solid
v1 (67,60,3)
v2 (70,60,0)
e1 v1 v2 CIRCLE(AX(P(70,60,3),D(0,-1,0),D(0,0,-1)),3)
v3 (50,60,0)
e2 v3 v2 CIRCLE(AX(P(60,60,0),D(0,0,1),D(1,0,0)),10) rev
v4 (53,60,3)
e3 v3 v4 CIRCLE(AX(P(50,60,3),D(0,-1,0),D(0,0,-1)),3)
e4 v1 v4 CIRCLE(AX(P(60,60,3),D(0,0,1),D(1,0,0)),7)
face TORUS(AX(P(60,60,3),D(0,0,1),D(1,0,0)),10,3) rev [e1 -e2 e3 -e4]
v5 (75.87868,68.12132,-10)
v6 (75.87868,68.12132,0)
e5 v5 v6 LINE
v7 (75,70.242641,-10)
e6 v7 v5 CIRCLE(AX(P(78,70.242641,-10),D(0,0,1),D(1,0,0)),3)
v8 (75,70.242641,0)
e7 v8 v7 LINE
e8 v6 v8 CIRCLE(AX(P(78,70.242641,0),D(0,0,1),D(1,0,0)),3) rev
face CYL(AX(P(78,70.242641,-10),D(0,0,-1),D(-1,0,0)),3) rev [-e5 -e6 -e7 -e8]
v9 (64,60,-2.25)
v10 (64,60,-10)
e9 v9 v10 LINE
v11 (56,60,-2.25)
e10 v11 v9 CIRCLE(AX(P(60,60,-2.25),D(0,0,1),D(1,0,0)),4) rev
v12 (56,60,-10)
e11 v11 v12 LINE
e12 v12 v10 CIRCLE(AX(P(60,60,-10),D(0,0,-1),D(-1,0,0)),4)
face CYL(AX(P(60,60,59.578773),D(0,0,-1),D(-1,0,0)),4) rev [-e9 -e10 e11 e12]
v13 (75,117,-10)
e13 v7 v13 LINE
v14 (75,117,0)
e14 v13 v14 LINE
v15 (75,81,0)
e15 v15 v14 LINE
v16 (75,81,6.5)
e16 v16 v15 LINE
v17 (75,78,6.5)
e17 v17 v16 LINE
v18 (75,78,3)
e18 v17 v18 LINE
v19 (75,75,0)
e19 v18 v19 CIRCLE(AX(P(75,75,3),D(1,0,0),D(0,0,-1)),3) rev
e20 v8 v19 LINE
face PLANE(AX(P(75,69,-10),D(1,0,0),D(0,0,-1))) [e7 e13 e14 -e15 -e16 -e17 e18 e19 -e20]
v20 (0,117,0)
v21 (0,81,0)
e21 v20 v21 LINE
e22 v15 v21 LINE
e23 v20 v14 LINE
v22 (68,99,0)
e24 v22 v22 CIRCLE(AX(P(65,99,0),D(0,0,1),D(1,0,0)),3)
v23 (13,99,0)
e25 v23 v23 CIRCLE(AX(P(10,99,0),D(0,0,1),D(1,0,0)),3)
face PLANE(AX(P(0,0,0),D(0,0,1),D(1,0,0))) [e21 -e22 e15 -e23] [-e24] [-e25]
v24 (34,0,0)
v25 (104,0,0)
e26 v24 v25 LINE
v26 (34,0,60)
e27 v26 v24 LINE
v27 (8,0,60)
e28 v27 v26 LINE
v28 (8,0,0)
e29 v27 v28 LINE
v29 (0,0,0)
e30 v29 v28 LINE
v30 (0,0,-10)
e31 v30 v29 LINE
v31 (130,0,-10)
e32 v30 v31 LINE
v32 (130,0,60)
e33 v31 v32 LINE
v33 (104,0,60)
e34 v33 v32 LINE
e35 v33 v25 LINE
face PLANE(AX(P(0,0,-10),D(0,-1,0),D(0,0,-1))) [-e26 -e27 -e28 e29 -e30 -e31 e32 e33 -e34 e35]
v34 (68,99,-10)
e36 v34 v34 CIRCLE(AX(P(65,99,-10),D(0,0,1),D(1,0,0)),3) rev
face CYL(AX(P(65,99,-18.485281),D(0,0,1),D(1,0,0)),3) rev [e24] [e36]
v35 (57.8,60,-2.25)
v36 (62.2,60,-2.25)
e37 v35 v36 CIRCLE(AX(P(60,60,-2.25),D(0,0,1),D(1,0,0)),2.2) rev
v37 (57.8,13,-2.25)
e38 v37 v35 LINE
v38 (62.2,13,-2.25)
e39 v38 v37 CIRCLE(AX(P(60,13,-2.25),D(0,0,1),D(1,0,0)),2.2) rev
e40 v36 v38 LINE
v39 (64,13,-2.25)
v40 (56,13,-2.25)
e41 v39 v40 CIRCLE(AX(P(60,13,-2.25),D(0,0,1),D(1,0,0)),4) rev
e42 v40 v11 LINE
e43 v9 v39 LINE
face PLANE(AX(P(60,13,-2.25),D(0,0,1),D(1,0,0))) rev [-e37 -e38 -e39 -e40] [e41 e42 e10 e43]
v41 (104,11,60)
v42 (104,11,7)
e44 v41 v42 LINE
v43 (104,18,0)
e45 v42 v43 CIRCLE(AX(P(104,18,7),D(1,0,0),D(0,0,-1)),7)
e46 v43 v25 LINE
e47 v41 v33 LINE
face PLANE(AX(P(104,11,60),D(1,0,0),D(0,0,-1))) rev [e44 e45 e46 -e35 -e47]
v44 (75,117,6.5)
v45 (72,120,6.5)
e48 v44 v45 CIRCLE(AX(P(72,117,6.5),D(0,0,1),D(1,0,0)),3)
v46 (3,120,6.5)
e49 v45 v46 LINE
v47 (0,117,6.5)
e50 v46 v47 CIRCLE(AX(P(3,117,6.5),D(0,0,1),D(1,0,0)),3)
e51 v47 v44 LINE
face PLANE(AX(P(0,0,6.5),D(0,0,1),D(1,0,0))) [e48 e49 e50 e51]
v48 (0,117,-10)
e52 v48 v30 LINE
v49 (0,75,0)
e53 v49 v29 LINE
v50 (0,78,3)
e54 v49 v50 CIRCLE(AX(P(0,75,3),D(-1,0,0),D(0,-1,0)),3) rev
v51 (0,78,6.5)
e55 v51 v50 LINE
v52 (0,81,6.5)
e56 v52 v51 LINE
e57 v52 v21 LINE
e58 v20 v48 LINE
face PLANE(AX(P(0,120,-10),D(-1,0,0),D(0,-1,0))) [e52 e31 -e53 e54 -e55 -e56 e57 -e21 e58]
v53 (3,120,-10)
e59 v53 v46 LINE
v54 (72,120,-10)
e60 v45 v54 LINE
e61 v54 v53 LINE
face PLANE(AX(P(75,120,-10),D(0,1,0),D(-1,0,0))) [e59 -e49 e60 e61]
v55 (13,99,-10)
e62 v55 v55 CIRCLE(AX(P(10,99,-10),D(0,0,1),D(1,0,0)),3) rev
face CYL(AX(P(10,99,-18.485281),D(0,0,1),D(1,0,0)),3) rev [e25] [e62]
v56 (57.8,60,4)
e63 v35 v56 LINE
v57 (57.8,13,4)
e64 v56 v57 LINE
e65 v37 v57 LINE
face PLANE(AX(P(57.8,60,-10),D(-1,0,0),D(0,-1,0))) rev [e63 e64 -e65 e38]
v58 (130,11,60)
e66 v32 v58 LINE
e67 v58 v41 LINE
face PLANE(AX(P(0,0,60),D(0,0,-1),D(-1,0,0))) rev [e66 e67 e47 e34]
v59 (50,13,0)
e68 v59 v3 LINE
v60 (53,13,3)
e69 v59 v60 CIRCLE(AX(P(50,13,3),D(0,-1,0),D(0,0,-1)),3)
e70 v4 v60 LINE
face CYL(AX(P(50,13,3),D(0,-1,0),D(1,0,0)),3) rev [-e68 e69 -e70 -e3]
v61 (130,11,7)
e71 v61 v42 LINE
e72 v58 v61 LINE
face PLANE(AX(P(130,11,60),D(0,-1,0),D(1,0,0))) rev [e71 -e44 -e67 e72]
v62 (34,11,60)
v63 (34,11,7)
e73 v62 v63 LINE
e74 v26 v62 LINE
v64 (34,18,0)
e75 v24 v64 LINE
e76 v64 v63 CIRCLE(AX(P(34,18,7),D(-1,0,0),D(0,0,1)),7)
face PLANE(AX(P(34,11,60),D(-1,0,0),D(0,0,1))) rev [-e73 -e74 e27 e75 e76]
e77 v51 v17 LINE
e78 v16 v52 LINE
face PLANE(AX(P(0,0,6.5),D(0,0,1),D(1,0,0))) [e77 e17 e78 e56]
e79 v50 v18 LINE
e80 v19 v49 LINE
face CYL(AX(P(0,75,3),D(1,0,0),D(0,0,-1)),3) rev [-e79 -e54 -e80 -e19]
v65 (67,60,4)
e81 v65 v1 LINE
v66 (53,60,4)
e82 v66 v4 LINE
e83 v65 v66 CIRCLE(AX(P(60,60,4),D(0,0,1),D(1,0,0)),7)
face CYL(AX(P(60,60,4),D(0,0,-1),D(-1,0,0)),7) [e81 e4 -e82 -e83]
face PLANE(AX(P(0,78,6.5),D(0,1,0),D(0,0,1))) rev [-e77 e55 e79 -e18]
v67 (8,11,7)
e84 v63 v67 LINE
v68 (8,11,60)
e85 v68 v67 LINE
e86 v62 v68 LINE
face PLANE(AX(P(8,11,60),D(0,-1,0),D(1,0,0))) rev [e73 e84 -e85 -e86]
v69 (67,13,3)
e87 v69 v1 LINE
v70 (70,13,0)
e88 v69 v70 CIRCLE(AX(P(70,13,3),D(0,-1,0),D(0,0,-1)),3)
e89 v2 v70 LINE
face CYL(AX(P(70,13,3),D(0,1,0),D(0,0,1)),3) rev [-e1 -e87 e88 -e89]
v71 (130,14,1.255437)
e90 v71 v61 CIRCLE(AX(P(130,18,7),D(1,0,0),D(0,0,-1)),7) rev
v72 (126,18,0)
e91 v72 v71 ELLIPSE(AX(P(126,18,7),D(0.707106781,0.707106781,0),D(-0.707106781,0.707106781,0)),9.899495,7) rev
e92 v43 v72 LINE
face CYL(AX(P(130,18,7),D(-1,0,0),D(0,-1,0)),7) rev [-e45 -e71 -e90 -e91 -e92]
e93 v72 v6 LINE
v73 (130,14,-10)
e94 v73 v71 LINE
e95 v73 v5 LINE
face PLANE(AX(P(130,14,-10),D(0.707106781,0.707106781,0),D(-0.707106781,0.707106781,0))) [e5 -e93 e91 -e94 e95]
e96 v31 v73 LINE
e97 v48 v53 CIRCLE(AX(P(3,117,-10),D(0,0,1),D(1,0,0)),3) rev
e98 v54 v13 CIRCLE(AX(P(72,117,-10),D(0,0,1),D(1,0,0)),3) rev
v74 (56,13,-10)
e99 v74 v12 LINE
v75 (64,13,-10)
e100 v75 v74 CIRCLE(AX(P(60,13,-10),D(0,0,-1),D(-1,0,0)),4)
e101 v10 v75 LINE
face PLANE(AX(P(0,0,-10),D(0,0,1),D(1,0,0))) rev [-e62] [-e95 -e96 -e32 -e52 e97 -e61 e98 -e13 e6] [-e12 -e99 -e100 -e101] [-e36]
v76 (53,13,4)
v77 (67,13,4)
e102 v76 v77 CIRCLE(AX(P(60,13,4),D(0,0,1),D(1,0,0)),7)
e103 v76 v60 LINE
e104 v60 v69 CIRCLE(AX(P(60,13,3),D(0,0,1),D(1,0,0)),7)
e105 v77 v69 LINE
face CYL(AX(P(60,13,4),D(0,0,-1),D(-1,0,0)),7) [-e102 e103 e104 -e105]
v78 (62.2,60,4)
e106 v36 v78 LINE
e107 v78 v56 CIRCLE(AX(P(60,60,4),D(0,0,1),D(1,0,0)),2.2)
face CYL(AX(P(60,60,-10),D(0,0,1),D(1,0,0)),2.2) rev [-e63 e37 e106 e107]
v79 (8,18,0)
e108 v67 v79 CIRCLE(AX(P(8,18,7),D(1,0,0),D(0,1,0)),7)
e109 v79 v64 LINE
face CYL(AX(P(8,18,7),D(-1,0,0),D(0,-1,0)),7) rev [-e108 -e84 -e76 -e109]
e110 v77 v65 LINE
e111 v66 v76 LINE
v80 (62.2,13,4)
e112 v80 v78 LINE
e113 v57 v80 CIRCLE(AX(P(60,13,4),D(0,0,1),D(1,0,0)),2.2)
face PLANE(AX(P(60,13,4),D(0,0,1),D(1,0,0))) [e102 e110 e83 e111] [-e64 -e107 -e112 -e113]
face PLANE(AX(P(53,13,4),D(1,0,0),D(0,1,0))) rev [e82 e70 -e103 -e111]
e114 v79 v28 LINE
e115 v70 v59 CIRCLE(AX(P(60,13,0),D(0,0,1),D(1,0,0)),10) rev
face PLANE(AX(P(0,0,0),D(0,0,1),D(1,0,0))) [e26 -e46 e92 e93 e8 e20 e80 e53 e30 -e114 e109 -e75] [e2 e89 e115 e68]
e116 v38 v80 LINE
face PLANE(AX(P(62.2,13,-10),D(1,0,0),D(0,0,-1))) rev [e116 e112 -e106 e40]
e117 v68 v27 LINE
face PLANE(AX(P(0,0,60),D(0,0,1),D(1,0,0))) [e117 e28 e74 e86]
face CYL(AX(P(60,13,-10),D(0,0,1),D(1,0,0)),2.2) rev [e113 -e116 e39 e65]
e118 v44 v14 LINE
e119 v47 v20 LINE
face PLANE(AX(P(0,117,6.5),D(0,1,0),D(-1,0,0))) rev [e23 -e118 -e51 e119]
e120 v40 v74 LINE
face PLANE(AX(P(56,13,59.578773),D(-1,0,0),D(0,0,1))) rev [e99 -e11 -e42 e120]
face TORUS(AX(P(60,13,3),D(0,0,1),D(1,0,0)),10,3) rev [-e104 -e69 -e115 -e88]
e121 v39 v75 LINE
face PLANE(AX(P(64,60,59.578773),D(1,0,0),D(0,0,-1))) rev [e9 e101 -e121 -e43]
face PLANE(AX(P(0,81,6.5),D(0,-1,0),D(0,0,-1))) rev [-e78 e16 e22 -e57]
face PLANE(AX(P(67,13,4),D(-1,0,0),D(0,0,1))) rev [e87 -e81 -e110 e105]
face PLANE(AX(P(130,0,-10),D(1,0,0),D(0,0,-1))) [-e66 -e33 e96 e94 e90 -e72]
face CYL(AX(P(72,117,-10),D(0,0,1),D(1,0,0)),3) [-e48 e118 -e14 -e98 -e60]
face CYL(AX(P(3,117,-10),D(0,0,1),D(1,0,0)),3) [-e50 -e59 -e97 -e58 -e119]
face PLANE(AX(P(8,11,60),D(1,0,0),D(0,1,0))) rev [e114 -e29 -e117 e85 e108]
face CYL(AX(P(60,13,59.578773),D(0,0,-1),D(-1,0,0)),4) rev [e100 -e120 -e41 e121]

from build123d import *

# Parameters (mm, degrees)
BOSS_EXTRUDE1_DEPTH = 10
SKETCH3_W           = 75
SKETCH3_H           = 3
BOSS_EXTRUDE2_DEPTH = 6.5
SKETCH4_R           = 3
CUT_EXTRUDE2_DEPTH  = 10
SKETCH5_W           = 26
SKETCH5_H           = 11
BOSS_EXTRUDE3_DEPTH = 60
BOSS_EXTRUDE5_DEPTH = 4
CUT_EXTRUDE3_DEPTH  = 186.569394028
FILLET2_START       = -10
FILLET2_DEPTH       = 10
FILLET2_2_DEPTH     = 75
FILLET2_START_2     = -11
FILLET2_3_DEPTH     = 18
CUT_EXTRUDE5_DEPTH  = 7.75
FILLET4_R           = 3
FILLET5_R           = 7


with BuildPart() as part:
    # Sketch2 → Boss-Extrude1 (new body)
    with BuildSketch(Plane.XY):
        Polygon((0, 0), (130, 0), (130, 14), (75, 69), (75, 120), (0, 120), align=None)
    extrude(amount=-BOSS_EXTRUDE1_DEPTH)

    # Sketch3 → Boss-Extrude2 (add)
    with BuildSketch(Plane.XY):
        with Locations((37.5, 118.5)):
            Rectangle(SKETCH3_W, SKETCH3_H)
        with Locations((37.5, 79.5)):
            Rectangle(SKETCH3_W, SKETCH3_H)
    extrude(amount=BOSS_EXTRUDE2_DEPTH)

    # Sketch4 → Cut-Extrude2 (cut)
    with BuildSketch(Plane.XY):
        with Locations((10, 99)):
            Circle(SKETCH4_R)
        with Locations((65, 99)):
            Circle(SKETCH4_R)
    extrude(amount=-CUT_EXTRUDE2_DEPTH, mode=Mode.SUBTRACT)

    # Sketch5 → Boss-Extrude3 (add)
    with BuildSketch(Plane.XY):
        with Locations((117, 5.5)):
            Rectangle(SKETCH5_W, SKETCH5_H)
        with Locations((21, 5.5)):
            Rectangle(SKETCH5_W, SKETCH5_H)
    extrude(amount=BOSS_EXTRUDE3_DEPTH)

    # Sketch7 → Boss-Extrude5 (add)
    with BuildSketch(Plane.XY):
        with BuildLine():
            Line((53, 13), (53, 60))
            ThreePointArc((53, 60), (60, 67), (67, 60))
            Line((67, 60), (67, 13))
            ThreePointArc((67, 13), (60, 6), (53, 13))
        make_face()
    extrude(amount=BOSS_EXTRUDE5_DEPTH)

    # Sketch8 → Cut-Extrude3 (cut, through all)
    with BuildSketch(Plane.XY.offset(4)):
        with BuildLine():
            Line((62.2, 13), (62.2, 60))
            ThreePointArc((62.2, 60), (60, 62.2), (57.8, 60))
            Line((57.8, 60), (57.8, 13))
            ThreePointArc((57.8, 13), (60, 10.8), (62.2, 13))
        make_face()
    extrude(amount=-CUT_EXTRUDE3_DEPTH, mode=Mode.SUBTRACT)

    # Fillet2: read off the stored shape, not the designer's step
    # Fillet2 outline → Fillet2 (add)
    with BuildSketch(Plane.XY.offset(FILLET2_START)):
        with BuildLine():
            ThreePointArc((75.878679656, 68.121320344), (75.228361402, 69.09459039), (75, 70.242640687))
            Line((75, 70.242640687), (75, 69))
            Line((75, 69), (75.878679656, 68.121320344))
        make_face()
    extrude(amount=FILLET2_DEPTH)

    # Fillet2 2 outline → Fillet2 2 (add)
    with BuildSketch(Plane.YZ):
        with BuildLine():
            ThreePointArc((78, 3), (77.121320344, 0.878679656), (75, 0))
            Line((75, 0), (78, 0))
            Line((78, 0), (78, 3))
        make_face()
    extrude(amount=FILLET2_2_DEPTH)

    # Fillet2 3 outline → Fillet2 3 (cut)
    with BuildSketch(Plane.XY.offset(FILLET2_START_2)):
        with BuildLine():
            ThreePointArc((0, 117), (0.878679656, 119.121320344), (3, 120))
            Line((3, 120), (0, 120))
            Line((0, 120), (0, 117))
        make_face()
        with BuildLine():
            ThreePointArc((72, 120), (74.121320344, 119.121320344), (75, 117))
            Line((75, 117), (75, 120))
            Line((75, 120), (72, 120))
        make_face()
    extrude(amount=FILLET2_3_DEPTH, mode=Mode.SUBTRACT)

    # Sketch9 → Cut-Extrude5 (cut)
    with BuildSketch(Plane(origin=(0, 0, -10), x_dir=(-1, 0, 0), z_dir=(0, 0, -1))):
        with BuildLine():
            Line((-64, 60), (-64, 13))
            ThreePointArc((-64, 13), (-60, 9), (-56, 13))
            Line((-56, 13), (-56, 60))
            ThreePointArc((-56, 60), (-60, 64), (-64, 60))
        make_face()
    extrude(amount=-CUT_EXTRUDE5_DEPTH, mode=Mode.SUBTRACT)

    # Fillet4
    fillet4_edges = [part.edges().sort_by_distance(p)[0] for p in [
        (60, 6, 0),
        (67, 36.5, 0),
        (60, 67, 0),
        (53, 36.5, 0),
    ]]
    fillet(fillet4_edges, radius=FILLET4_R)

    # Fillet5
    fillet5_edges = [part.edges().sort_by_distance(p)[0] for p in [
        (117, 11, 0),
        (21, 11, 0),
    ]]
    fillet(fillet5_edges, radius=FILLET5_R)


solid = part.part
